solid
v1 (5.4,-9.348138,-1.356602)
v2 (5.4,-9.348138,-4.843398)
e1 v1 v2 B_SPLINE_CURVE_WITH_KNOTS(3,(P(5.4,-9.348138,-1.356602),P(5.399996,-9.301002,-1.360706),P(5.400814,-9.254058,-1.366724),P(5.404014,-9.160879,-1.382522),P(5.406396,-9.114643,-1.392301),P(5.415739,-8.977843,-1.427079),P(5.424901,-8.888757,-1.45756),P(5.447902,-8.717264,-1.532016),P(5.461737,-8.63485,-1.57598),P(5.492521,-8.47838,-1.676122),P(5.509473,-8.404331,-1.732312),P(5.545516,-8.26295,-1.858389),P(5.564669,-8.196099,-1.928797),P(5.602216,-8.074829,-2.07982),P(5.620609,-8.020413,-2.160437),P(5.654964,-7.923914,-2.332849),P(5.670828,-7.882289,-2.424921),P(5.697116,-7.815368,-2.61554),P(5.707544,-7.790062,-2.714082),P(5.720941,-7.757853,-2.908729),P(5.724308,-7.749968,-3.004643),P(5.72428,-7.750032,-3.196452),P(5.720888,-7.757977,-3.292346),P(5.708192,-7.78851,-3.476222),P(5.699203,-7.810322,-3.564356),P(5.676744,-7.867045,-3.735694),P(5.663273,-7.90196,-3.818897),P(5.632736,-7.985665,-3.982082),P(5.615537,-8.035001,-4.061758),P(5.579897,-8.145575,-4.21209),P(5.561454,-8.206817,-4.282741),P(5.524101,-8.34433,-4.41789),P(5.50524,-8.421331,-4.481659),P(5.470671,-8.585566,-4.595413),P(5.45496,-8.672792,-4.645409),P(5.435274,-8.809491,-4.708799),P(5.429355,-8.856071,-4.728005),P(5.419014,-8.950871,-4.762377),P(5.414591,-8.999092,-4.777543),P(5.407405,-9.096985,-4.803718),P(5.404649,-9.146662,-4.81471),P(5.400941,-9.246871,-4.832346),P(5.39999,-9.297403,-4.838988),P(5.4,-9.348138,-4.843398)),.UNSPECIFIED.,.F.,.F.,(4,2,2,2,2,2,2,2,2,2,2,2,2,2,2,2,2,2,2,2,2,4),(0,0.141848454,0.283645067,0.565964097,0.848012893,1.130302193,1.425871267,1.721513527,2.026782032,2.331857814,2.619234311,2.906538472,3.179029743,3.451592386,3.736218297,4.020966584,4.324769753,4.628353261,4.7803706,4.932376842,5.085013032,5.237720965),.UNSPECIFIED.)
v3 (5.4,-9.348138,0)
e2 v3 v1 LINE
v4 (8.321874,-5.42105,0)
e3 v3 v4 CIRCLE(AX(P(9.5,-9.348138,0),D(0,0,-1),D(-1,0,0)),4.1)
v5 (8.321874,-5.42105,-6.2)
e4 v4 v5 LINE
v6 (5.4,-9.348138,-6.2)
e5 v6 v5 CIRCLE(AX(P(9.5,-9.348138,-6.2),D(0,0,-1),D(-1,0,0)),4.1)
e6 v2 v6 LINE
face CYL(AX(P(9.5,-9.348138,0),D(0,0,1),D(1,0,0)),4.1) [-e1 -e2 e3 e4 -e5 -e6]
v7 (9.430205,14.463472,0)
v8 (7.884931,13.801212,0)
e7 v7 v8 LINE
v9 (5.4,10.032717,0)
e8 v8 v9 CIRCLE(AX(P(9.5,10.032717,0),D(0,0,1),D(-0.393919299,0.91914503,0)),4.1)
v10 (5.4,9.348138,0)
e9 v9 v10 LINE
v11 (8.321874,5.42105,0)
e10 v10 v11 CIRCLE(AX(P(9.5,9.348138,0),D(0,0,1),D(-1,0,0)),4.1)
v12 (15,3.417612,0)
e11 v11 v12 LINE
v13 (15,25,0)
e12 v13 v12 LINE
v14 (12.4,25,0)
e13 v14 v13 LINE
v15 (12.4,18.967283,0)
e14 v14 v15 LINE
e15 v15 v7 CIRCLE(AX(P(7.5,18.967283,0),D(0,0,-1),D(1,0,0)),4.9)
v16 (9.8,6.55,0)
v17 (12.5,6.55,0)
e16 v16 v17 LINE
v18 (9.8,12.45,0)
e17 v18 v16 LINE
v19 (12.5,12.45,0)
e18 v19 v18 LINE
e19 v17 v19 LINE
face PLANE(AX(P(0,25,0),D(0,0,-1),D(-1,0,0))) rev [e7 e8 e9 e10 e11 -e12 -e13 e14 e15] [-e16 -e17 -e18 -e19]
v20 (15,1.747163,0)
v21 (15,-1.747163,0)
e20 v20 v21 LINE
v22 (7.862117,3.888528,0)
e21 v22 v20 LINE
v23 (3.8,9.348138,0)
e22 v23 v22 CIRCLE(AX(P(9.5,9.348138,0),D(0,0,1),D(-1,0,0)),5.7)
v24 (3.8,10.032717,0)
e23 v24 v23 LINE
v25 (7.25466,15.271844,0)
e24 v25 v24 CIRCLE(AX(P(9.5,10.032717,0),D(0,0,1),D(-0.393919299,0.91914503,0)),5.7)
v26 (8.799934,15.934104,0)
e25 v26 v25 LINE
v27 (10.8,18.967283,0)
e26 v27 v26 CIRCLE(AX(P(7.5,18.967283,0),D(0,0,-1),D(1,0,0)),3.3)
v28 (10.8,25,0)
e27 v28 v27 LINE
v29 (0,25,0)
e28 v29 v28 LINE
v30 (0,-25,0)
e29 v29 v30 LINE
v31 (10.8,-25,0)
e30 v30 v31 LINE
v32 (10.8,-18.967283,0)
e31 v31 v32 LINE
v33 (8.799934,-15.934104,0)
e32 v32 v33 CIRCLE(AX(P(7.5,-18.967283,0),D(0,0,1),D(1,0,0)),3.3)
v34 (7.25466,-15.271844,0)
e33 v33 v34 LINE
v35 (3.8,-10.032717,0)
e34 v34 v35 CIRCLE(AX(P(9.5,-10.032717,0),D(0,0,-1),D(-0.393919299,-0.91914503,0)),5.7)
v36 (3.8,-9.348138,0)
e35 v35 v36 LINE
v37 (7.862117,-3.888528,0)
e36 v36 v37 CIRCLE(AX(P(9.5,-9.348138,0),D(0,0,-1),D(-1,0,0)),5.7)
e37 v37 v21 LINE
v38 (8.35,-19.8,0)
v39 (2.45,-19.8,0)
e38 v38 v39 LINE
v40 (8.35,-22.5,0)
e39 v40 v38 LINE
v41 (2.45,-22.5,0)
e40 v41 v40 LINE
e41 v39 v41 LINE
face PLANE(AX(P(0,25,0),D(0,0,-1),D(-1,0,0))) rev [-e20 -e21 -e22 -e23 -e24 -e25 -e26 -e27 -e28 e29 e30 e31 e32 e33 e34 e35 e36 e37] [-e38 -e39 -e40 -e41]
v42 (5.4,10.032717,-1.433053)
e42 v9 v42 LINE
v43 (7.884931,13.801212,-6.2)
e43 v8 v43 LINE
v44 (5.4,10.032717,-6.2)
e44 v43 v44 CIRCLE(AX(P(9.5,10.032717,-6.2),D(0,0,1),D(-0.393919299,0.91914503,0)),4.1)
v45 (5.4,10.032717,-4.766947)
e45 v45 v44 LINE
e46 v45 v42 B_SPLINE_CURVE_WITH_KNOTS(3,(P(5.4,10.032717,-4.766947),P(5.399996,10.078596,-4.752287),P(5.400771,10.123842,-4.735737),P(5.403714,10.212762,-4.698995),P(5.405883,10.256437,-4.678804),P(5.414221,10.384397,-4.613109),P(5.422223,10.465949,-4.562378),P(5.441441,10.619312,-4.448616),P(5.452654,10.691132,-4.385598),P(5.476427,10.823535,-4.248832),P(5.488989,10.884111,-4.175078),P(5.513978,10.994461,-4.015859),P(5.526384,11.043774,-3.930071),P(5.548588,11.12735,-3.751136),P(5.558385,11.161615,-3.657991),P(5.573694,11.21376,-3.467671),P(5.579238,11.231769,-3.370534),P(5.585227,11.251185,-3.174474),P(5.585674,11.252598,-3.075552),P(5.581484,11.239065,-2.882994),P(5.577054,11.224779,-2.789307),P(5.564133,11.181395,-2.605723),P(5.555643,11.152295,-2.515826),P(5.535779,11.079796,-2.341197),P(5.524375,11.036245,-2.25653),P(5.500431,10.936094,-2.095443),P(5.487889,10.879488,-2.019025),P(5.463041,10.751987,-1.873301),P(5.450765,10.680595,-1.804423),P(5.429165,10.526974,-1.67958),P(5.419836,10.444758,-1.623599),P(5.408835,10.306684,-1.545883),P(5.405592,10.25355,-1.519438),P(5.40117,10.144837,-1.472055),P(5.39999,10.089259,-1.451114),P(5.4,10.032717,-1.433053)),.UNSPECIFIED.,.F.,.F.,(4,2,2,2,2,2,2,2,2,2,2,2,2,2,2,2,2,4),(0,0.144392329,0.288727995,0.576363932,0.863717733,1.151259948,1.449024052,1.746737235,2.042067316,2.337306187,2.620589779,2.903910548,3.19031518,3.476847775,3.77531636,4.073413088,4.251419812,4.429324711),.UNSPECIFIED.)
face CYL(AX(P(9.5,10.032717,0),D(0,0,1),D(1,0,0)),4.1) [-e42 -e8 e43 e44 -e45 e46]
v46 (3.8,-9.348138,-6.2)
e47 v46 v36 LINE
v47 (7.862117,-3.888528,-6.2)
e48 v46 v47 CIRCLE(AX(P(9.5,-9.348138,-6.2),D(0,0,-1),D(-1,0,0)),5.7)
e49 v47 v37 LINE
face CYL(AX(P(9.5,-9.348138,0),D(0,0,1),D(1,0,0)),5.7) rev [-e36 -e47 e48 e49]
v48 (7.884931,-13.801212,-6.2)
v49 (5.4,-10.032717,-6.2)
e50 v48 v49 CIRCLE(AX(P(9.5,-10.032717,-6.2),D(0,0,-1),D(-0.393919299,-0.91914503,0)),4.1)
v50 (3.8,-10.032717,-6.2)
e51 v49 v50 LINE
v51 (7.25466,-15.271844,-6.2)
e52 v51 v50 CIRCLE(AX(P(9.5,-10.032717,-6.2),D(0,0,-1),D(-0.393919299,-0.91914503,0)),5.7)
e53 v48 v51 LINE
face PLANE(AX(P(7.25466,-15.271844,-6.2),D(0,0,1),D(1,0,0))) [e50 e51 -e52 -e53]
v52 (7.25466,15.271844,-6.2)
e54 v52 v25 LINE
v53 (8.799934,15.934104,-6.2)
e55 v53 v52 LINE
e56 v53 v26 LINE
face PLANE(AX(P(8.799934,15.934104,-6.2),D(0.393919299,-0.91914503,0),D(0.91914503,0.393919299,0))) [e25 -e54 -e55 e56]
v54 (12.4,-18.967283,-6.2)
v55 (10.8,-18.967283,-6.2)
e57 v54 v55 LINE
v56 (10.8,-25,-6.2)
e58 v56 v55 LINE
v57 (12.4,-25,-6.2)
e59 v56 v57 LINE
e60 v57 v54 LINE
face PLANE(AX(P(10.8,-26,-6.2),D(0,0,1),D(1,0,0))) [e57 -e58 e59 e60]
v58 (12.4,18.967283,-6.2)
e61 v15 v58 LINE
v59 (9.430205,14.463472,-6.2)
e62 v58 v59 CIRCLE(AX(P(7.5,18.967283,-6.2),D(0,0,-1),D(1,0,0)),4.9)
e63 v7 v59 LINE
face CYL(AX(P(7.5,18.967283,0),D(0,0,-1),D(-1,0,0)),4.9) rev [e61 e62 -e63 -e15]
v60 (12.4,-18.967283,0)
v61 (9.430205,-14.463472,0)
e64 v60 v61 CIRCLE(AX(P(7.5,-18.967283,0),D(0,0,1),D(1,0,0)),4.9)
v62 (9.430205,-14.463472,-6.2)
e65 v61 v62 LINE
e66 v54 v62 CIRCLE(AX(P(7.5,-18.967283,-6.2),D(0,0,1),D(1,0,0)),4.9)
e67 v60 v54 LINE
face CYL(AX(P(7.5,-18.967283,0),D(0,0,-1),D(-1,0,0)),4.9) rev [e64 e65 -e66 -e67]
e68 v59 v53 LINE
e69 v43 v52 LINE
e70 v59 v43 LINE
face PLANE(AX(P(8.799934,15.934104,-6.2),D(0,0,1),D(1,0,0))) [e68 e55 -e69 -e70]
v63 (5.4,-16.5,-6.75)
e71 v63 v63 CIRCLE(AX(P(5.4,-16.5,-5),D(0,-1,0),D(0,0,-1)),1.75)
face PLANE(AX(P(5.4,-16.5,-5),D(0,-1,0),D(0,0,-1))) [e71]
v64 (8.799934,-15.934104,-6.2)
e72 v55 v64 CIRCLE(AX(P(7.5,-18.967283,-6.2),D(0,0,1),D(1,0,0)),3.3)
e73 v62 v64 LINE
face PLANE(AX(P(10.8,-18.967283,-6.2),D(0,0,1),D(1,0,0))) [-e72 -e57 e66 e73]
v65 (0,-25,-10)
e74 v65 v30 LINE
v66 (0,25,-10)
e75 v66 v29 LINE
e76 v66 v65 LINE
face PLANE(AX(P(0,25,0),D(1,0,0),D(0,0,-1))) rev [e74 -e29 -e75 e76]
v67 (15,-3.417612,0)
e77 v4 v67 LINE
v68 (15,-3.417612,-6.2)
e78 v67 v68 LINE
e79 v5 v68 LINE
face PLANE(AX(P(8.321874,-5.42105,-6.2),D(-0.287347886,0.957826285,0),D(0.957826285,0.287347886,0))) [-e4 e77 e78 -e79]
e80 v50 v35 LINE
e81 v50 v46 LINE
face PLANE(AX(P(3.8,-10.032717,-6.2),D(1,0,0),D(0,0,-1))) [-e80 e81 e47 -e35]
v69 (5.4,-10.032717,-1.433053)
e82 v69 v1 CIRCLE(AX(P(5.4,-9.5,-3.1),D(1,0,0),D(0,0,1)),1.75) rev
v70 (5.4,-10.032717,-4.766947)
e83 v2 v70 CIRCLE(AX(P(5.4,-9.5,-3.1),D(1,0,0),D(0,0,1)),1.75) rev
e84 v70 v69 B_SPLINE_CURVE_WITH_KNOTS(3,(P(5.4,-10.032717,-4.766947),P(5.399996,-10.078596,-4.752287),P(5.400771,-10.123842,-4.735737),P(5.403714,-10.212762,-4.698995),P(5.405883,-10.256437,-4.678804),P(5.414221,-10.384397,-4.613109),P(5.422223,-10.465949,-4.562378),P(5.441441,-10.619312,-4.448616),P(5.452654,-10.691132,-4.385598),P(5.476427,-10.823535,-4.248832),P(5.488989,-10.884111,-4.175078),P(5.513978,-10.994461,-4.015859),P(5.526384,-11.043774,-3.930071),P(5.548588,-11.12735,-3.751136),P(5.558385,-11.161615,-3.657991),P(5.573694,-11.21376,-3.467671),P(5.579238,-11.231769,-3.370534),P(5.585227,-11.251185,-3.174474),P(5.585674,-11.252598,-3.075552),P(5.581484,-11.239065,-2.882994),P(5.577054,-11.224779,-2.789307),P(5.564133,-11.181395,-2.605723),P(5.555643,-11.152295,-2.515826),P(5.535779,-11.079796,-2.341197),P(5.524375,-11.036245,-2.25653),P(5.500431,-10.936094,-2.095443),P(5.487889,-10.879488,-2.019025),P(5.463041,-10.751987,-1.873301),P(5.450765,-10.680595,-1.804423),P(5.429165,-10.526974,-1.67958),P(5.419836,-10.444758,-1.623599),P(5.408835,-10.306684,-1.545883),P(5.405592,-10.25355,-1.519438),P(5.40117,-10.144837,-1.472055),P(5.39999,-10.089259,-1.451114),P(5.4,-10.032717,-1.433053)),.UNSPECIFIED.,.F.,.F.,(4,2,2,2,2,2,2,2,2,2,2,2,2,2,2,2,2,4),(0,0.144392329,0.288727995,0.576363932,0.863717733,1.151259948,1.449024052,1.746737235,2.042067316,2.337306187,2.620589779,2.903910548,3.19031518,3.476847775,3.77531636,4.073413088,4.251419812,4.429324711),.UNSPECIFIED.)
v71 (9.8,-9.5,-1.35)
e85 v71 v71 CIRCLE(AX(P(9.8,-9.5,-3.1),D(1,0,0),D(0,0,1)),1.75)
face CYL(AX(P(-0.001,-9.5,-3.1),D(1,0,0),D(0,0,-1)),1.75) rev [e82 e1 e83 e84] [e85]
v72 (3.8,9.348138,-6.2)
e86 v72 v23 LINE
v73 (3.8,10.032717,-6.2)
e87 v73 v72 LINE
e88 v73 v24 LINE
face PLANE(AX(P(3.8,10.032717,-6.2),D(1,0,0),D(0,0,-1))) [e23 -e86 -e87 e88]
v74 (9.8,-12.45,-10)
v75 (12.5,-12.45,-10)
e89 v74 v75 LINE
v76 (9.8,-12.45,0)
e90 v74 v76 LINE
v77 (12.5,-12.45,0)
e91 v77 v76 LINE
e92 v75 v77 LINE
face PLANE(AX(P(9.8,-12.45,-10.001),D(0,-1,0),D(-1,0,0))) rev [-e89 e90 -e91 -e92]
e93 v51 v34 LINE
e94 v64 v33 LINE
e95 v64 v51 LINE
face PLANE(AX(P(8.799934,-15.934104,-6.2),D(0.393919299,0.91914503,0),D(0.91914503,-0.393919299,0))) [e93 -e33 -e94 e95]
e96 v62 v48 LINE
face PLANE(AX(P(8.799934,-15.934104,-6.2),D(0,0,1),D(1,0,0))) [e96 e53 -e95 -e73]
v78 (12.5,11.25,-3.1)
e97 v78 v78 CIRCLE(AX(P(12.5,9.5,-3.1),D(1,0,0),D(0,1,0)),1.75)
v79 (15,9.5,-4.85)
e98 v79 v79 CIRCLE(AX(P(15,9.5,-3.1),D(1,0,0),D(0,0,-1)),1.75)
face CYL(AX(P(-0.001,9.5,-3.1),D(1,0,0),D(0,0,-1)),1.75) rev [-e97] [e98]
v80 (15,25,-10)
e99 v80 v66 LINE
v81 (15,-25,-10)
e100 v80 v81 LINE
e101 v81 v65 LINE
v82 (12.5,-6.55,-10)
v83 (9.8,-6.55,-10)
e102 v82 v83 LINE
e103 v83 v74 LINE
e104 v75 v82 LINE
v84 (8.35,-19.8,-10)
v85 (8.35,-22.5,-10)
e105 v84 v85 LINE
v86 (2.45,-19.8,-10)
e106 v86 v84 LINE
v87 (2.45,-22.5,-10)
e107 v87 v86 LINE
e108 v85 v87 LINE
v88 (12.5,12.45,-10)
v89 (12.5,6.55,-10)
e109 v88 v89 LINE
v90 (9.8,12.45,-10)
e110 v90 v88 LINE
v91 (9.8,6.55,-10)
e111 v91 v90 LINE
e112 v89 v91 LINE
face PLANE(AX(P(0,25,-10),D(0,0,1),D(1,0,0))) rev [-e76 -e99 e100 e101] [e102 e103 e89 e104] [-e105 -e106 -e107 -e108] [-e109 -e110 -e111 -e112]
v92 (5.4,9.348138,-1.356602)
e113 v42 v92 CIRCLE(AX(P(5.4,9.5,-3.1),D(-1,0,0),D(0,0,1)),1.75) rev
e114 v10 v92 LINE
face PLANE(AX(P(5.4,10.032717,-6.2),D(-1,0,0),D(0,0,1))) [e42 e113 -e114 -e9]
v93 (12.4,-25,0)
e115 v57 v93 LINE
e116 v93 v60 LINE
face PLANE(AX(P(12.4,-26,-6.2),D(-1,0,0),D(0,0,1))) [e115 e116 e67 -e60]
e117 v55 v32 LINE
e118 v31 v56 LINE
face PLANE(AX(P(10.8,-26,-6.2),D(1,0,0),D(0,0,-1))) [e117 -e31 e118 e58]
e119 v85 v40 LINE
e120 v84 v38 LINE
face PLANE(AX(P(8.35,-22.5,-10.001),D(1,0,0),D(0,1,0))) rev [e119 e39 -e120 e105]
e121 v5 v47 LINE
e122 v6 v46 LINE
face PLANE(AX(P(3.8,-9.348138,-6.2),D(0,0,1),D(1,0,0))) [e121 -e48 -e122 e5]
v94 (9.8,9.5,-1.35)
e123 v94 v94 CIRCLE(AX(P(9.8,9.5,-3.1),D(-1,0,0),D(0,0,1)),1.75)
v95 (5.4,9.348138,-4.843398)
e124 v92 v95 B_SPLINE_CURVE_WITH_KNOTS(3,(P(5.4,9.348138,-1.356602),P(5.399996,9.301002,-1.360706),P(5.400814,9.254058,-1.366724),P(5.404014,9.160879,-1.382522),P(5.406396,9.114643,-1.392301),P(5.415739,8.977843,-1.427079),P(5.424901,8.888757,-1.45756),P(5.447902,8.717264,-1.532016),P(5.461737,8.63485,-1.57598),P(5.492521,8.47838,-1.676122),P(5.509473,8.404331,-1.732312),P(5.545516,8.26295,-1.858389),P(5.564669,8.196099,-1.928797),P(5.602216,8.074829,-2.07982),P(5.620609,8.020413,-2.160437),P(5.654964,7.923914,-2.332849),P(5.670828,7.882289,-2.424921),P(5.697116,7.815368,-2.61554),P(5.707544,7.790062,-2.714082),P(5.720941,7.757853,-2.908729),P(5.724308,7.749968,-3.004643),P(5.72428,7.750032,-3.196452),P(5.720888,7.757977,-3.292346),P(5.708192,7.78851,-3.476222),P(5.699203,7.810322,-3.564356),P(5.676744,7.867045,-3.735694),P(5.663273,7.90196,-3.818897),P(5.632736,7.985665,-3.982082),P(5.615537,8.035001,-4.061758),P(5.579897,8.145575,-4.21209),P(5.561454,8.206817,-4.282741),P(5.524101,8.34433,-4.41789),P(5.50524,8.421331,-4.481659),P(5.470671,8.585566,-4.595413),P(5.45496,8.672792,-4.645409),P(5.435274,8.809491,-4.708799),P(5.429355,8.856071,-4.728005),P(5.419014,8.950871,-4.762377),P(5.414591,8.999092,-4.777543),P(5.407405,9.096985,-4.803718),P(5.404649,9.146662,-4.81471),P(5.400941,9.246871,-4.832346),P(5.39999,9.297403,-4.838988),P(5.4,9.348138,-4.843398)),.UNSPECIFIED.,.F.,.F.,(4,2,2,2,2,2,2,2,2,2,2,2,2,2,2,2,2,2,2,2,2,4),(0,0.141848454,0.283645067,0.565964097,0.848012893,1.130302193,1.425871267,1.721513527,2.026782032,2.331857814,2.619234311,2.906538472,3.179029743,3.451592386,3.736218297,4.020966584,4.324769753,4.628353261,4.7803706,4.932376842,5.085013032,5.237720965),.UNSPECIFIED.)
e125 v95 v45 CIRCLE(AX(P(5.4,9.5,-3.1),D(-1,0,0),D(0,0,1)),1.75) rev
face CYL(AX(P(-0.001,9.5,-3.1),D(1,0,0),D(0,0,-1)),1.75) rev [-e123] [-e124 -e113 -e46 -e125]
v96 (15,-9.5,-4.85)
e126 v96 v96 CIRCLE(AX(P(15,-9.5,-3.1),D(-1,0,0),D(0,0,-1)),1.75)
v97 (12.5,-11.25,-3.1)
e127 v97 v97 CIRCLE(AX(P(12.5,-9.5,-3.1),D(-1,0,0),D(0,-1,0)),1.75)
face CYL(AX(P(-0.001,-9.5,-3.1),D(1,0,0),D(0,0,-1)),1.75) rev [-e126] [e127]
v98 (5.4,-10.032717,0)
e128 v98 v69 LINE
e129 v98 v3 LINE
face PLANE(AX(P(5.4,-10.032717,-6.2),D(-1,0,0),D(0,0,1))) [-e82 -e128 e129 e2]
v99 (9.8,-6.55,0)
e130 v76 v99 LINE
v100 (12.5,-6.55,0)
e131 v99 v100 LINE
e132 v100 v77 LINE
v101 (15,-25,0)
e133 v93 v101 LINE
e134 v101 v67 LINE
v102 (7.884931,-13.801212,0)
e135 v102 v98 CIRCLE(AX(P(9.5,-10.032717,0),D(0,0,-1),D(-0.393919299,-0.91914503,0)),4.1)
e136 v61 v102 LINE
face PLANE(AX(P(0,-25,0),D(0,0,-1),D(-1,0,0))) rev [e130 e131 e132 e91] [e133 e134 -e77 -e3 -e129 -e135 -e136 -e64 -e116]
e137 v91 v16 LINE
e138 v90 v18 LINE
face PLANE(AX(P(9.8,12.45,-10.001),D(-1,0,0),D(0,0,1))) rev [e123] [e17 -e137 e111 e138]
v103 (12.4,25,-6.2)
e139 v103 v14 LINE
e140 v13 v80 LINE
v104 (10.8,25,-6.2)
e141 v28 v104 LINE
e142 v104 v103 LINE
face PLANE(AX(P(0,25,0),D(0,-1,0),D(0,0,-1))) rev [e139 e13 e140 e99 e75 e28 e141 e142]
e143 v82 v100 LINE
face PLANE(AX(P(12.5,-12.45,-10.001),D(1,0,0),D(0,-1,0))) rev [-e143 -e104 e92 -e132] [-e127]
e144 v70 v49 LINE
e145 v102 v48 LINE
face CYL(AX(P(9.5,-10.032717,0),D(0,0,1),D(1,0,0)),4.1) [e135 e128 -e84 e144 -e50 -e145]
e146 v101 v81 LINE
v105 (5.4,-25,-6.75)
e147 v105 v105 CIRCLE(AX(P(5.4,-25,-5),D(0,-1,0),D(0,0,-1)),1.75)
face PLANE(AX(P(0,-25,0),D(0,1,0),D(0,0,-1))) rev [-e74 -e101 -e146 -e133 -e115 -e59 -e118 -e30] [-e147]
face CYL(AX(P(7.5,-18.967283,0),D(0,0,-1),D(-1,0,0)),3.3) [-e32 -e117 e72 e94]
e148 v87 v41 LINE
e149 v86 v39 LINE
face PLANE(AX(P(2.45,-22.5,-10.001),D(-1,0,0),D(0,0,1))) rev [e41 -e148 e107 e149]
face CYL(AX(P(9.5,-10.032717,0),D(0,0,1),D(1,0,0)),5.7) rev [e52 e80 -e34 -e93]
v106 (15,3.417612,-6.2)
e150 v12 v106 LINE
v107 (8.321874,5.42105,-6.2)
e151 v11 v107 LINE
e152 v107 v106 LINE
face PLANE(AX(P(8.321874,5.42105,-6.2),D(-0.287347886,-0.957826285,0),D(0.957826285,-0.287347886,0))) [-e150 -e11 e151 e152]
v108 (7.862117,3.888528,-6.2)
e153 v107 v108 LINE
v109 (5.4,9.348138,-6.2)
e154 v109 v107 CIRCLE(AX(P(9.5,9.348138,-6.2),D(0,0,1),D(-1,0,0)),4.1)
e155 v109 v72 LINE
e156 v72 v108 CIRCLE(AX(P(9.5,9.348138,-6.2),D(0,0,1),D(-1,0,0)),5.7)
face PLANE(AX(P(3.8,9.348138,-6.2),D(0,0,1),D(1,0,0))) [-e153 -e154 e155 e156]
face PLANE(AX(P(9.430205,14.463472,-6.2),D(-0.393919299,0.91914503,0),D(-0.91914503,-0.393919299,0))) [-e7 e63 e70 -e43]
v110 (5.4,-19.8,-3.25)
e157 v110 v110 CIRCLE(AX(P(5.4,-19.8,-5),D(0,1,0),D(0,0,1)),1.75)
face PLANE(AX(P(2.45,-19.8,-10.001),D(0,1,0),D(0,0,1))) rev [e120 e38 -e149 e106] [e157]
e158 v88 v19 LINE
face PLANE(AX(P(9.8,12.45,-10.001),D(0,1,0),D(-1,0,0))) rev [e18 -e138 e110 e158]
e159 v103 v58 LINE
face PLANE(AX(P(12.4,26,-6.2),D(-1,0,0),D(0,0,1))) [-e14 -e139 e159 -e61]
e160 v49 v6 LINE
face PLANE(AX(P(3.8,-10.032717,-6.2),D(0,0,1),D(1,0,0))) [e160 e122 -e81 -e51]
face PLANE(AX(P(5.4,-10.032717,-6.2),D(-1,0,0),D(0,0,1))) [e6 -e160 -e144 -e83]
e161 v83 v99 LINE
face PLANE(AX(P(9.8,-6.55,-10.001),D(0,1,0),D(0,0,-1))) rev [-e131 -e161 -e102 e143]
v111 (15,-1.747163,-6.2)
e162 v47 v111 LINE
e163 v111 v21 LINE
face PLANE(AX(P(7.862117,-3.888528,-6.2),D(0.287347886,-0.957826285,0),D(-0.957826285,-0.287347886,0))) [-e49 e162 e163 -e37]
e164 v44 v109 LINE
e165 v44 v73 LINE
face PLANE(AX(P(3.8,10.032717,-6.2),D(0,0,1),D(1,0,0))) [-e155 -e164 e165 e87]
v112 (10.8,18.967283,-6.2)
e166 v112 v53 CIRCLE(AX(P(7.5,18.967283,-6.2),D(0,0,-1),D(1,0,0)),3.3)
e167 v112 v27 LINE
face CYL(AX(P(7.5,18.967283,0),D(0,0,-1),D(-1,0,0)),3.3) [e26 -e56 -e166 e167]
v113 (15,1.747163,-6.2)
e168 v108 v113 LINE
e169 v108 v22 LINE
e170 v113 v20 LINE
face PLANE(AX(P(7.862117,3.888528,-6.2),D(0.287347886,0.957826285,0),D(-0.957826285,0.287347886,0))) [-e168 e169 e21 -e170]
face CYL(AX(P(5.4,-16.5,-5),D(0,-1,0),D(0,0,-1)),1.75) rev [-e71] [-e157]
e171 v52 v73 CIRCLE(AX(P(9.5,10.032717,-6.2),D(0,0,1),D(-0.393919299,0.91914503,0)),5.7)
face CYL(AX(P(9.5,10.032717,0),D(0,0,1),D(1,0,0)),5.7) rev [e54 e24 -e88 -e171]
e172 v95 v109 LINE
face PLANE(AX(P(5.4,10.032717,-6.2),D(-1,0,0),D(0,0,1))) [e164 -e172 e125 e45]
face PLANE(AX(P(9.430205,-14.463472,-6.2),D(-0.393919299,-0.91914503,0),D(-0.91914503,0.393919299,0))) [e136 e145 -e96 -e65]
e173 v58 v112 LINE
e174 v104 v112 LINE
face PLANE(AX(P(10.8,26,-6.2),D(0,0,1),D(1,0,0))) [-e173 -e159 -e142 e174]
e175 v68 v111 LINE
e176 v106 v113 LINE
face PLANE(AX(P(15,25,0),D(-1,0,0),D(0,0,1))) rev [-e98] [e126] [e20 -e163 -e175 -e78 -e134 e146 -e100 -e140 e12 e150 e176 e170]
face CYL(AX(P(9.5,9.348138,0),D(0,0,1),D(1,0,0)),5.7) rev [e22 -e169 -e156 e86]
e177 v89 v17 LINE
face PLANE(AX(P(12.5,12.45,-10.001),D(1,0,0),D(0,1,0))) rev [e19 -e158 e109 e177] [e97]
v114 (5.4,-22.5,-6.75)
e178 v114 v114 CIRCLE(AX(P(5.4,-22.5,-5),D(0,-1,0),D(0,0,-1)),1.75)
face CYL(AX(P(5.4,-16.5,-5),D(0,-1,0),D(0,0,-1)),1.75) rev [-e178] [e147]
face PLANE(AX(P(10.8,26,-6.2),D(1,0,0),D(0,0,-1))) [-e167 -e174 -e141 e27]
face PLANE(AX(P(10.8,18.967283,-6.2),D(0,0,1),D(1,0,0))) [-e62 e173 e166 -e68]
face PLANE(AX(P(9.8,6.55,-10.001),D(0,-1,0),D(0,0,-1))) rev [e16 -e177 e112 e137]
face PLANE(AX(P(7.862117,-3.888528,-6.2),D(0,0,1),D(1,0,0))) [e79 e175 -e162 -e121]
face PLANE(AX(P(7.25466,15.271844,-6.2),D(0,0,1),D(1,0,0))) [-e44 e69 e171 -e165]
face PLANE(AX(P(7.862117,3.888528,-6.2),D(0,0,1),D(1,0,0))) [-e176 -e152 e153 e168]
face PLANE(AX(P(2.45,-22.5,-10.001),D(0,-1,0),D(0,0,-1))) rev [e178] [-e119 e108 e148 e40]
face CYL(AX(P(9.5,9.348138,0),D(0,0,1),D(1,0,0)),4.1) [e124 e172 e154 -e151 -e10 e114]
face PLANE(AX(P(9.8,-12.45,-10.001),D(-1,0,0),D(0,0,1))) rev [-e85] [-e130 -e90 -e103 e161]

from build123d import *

# Parameters (mm, degrees)
ESQUISSE1_W                           = 15
ESQUISSE1_H                           = 10
BOSS_EXTRU_1_DEPTH                    = 25
ENL_VEMENT_START                      = -6.2
ENL_VEMENT_DE_MATI_RE_BALAYAGE1_DEPTH = 6.2
ENL_V_MAT_EXTRU_1_REACH               = 32.822
ESQUISSE4_R                           = 1.75
ENL_V_MAT_EXTRU_2_REACH               = 32.822
ESQUISSE5_W                           = 2.7
ESQUISSE5_H                           = 5.9
ENL_V_MAT_EXTRU_3_REACH               = 32.822
ESQUISSE6_W                           = 5.9
ESQUISSE6_H                           = 2.7
ESQUISSE7_R                           = 1.75
ENL_V_MAT_EXTRU_4_DEPTH               = 8.5


# Read off the part's stored shape, not the designer's step: Enlèvement de matière-Balayage1
with BuildPart() as part:
    # Esquisse1 → Boss.-Extru.1 (new body)
    with BuildSketch(Plane(origin=(0, 0, 0), x_dir=(1, 0, 0), z_dir=(0, 1, 0))):
        with Locations((7.5, 5)):
            Rectangle(ESQUISSE1_W, ESQUISSE1_H)
    extrude(amount=BOSS_EXTRU_1_DEPTH)

    # Enlèvement de matière-Balayage1 outline → Enlèvement de matière-Balayage1 (cut)
    with BuildSketch(Plane.XY.offset(ENL_VEMENT_START)):
        with BuildLine():
            Line((10.8, 25), (10.8, 18.967282711))
            ThreePointArc((10.8, 18.967282711), (10.254975604, 17.150662382), (8.799933685, 15.934104112))
            Line((8.799933685, 15.934104112), (7.254659998, 15.27184396))
            ThreePointArc((7.254659998, 15.27184396), (4.741405774, 13.170516039), (3.8, 10.032717289))
            Line((3.8, 10.032717289), (3.8, 9.348137929))
            ThreePointArc((3.8, 9.348137929), (4.926930309, 5.94563391), (7.862117052, 3.888528103))
            Line((7.862117052, 3.888528103), (15, 1.747163219))
            Line((15, 1.747163219), (15, 3.41761226))
            Line((15, 3.41761226), (8.321873669, 5.42105016))
            ThreePointArc((8.321873669, 5.42105016), (6.210598994, 6.900722757), (5.4, 9.348137929))
            Line((5.4, 9.348137929), (5.4, 10.032717289))
            ThreePointArc((5.4, 10.032717289), (6.077151522, 12.289730425), (7.884930876, 13.801211912))
            Line((7.884930876, 13.801211912), (9.430204563, 14.463472064))
            ThreePointArc((9.430204563, 14.463472064), (11.590721352, 16.269876768), (12.4, 18.967282711))
            Line((12.4, 18.967282711), (12.4, 25))
            Line((12.4, 25), (10.8, 25))
        make_face()
    extrude(amount=ENL_VEMENT_DE_MATI_RE_BALAYAGE1_DEPTH, mode=Mode.SUBTRACT)

    # Esquisse4 → Enlèv. mat.-Extru.1 (cut, up to next)
    with BuildSketch(Plane(origin=(15, 0, 0), x_dir=(0, 0, -1), z_dir=(1, 0, 0)), mode=Mode.PRIVATE) as enl_v_mat_extru_1_sk1:
        with Locations((3.1, 9.5)):
            Circle(ESQUISSE4_R)
    enl_v_mat_extru_1_tool1 = extrude(enl_v_mat_extru_1_sk1.sketch, amount=-ENL_V_MAT_EXTRU_1_REACH, mode=Mode.PRIVATE) & part.part
    add(enl_v_mat_extru_1_tool1.solids().sort_by_distance((15, 9.5, -3.1))[0], mode=Mode.SUBTRACT)

    # Esquisse5 → Enlèv. mat.-Extru.2 (cut, up to next)
    with BuildSketch(Plane.XY, mode=Mode.PRIVATE) as enl_v_mat_extru_2_sk1:
        with Locations((11.15, 9.5)):
            Rectangle(ESQUISSE5_W, ESQUISSE5_H)
    enl_v_mat_extru_2_tool1 = extrude(enl_v_mat_extru_2_sk1.sketch, amount=-ENL_V_MAT_EXTRU_2_REACH, mode=Mode.PRIVATE) & part.part
    add(enl_v_mat_extru_2_tool1.solids().sort_by_distance((11.15, 9.5, 0))[0], mode=Mode.SUBTRACT)

    # Symétrie1: part across plane


with BuildPart() as part_1:
    add(part.part)
    add(part.part.mirror(Plane(origin=(0, 0, 0), x_dir=(0, 0, 1), z_dir=(0, -1, 0))))

    # Esquisse6 → Enlèv. mat.-Extru.3 (cut, up to next)
    with BuildSketch(Plane.XY, mode=Mode.PRIVATE) as enl_v_mat_extru_3_sk1:
        with Locations((5.4, -21.15)):
            Rectangle(ESQUISSE6_W, ESQUISSE6_H)
    enl_v_mat_extru_3_tool1 = extrude(enl_v_mat_extru_3_sk1.sketch, amount=-ENL_V_MAT_EXTRU_3_REACH, mode=Mode.PRIVATE) & part_1.part
    add(enl_v_mat_extru_3_tool1.solids().sort_by_distance((5.4, -21.15, 0))[0], mode=Mode.SUBTRACT)

    # Esquisse7 → Enlèv. mat.-Extru.4 (cut)
    with BuildSketch(Plane.XZ.offset(25)):
        with Locations(Location((5.4, -5, 0), (0, 0, 270))):
            Circle(ESQUISSE7_R)
    extrude(amount=-ENL_V_MAT_EXTRU_4_DEPTH, mode=Mode.SUBTRACT)


solid = part_1.part
